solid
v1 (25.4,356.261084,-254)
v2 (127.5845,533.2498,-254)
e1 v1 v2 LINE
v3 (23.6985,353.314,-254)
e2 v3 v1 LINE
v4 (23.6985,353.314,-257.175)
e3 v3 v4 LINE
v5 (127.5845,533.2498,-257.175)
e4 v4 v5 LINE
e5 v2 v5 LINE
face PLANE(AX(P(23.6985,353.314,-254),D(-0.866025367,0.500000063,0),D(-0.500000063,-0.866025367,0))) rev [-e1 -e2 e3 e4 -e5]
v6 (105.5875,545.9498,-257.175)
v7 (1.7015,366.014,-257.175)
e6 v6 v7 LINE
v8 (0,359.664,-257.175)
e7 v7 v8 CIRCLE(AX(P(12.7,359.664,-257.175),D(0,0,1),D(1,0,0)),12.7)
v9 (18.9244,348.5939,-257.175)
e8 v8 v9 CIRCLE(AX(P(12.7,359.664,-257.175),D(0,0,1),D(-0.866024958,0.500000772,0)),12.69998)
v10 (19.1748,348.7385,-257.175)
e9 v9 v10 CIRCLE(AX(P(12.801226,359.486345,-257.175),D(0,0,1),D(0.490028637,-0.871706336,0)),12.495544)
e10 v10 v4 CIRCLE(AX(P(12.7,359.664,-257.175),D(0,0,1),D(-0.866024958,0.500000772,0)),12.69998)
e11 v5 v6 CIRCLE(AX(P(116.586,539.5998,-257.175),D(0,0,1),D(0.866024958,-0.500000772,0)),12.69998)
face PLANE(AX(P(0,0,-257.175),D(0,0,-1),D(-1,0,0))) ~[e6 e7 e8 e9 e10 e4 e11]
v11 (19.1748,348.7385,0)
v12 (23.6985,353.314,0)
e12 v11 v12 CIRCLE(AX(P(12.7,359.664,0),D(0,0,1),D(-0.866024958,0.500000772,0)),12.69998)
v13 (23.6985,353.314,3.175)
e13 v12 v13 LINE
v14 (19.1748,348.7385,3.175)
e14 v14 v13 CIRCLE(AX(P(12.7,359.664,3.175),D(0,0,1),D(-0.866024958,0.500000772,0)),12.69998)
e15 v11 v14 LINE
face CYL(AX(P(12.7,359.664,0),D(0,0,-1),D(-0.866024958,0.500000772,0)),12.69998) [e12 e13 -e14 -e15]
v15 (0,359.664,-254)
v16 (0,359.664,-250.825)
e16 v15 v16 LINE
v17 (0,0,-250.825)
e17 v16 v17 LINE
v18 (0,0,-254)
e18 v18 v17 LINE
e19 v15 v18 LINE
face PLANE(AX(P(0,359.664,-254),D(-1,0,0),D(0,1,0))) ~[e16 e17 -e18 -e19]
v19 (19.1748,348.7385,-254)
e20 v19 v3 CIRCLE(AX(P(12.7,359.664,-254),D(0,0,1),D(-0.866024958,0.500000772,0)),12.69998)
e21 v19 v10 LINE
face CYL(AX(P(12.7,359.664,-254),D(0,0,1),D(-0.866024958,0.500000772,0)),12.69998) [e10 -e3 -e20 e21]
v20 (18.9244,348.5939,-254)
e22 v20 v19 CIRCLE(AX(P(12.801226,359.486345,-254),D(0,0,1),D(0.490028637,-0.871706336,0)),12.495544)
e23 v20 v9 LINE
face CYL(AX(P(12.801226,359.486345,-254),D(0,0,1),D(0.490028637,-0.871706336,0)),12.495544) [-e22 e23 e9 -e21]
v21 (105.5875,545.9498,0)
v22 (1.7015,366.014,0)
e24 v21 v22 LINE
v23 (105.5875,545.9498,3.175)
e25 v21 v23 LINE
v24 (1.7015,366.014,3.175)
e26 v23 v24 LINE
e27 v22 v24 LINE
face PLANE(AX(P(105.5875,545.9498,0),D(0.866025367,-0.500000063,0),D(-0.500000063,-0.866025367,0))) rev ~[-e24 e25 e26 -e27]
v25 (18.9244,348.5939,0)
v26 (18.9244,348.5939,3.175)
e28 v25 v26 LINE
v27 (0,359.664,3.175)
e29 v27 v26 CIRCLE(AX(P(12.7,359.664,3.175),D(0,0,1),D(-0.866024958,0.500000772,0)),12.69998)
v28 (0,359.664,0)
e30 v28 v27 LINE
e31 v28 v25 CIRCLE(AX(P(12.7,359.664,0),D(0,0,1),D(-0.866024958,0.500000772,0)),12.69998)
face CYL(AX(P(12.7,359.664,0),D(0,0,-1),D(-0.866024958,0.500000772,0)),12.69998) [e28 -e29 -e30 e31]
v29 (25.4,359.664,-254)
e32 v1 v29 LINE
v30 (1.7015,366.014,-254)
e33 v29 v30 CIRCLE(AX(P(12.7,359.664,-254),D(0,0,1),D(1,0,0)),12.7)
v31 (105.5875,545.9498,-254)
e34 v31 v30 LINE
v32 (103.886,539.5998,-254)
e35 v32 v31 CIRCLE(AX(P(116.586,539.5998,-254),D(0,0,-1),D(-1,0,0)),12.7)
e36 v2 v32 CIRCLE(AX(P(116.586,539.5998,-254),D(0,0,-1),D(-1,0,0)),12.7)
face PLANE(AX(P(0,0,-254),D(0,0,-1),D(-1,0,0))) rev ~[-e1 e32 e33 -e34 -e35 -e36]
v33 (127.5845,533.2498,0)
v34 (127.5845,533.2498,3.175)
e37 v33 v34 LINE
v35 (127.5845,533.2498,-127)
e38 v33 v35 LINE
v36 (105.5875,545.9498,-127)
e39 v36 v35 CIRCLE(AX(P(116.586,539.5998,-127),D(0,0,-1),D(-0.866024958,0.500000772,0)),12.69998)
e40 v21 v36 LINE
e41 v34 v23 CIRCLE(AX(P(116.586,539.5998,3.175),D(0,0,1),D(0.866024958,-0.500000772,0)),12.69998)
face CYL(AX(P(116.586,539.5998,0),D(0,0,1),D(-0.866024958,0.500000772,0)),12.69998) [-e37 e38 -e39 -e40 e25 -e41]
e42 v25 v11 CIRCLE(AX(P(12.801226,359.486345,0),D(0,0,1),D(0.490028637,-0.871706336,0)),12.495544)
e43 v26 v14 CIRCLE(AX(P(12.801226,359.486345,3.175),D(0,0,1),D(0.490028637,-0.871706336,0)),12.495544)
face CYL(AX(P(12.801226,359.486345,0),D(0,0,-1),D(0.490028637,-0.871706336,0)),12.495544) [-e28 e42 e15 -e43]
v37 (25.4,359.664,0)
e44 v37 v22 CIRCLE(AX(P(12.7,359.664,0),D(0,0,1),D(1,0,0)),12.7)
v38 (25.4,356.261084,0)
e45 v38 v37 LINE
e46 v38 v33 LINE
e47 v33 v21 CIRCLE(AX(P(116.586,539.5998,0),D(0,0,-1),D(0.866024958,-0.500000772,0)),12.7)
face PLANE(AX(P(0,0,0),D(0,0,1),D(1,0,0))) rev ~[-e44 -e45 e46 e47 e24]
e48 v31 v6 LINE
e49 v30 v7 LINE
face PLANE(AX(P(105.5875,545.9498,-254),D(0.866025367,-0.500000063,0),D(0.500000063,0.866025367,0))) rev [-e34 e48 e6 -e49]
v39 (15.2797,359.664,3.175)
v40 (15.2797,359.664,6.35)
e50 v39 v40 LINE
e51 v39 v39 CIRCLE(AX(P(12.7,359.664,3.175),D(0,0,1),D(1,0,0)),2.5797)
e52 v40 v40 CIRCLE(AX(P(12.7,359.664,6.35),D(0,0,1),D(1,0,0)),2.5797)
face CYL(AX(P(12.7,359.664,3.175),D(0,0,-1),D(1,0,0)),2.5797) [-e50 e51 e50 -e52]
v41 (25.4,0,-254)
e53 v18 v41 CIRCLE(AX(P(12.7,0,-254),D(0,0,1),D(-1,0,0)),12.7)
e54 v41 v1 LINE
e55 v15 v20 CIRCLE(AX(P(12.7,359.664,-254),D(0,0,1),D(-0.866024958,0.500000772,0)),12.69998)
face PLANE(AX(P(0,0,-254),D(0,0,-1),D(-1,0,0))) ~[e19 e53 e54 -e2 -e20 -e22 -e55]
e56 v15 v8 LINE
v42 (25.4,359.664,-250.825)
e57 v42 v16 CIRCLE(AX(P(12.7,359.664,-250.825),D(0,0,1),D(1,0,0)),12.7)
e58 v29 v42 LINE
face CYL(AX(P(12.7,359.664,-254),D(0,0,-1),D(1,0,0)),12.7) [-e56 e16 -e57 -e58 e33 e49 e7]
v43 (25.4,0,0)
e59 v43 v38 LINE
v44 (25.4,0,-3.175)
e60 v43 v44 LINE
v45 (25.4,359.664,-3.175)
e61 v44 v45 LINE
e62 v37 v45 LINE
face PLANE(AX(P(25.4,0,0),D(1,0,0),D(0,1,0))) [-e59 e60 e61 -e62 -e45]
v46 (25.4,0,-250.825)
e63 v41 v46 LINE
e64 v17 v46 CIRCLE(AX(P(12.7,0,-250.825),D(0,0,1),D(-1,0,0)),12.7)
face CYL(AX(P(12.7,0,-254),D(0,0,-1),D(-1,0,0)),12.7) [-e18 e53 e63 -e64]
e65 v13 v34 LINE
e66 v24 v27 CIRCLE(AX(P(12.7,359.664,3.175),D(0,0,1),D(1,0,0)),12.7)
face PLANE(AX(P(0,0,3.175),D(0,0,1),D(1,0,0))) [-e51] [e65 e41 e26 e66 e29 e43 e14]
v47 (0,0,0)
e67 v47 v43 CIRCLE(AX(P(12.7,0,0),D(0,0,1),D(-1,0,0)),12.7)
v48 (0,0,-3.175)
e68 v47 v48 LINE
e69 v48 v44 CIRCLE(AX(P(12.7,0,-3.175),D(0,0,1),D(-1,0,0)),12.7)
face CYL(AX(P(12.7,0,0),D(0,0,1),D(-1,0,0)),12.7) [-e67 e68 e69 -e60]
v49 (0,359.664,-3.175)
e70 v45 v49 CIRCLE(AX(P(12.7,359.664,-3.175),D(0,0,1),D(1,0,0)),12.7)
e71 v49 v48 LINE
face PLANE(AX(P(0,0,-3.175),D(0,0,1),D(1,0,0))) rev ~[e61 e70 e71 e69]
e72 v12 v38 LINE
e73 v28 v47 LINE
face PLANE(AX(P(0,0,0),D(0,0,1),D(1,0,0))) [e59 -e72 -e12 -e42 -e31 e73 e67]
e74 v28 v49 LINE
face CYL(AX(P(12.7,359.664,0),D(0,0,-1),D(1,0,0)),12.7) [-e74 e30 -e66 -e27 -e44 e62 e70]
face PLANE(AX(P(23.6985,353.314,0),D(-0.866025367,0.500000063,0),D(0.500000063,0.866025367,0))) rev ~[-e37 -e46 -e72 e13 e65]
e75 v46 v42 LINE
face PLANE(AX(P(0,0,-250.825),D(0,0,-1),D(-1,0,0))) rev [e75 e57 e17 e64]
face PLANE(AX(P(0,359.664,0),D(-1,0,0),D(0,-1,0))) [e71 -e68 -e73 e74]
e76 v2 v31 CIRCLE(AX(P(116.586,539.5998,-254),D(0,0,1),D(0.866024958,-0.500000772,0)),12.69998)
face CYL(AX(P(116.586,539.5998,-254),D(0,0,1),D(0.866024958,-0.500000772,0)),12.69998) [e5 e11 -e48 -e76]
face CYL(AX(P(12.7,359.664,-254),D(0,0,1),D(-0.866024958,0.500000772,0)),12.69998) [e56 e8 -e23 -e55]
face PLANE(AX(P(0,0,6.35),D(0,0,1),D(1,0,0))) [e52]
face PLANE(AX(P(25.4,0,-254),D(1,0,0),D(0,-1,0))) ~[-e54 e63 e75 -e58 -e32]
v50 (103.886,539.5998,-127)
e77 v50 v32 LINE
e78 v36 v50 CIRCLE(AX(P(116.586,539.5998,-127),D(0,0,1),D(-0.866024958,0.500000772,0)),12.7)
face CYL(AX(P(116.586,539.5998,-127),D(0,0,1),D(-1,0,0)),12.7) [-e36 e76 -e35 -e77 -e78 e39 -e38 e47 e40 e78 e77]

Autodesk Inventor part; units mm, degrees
ref_plane "YZ Plane" through (0, 0, 0) normal (1, 0, 0) x (0, 1, 0)
sketch "Sketch1" plane through (0, 0, 0) normal (0, 0, 1) x (1, 0, 0)
  line L0 (25.4, 0) -> (25.4, 359.664)
  line L1 (0, 359.664) -> (0, 0)
  arc A0 (0, 0) -> (25.4, 0) centre (12.7, 0) ccw
  arc A1 (25.4, 359.664) -> (0, 359.664) centre (12.7, 359.664) ccw
sketch "Sketch2" plane through (0, 0, 0) normal (0, 0, 1) x (1, 0, 0)
  line L0 (-287.7794, 186.1816) -> (71.8846, 186.1816) construction
  arc A0 (25.4, 359.664) -> (0, 359.664) centre (12.7, 359.664) ccw projected
  arc A1 (18.9244, 348.5939) -> (19.1748, 348.7385) centre (12.7, 359.664) ccw
  arc A2 (6.4756, 370.7341) -> (6.2252, 370.5895) centre (12.7, 359.664) ccw
  line L1 (12.7, 359.664) -> (220.472, 359.664) construction
  line L2 (23.6985, 353.314) -> (127.5845, 533.2498)
  line L3 (105.5875, 545.9498) -> (1.7015, 366.014)
  arc A3 (1.7015, 366.014) -> (23.6985, 353.314) centre (12.7, 359.664) ccw
  arc A4 (127.5845, 533.2498) -> (105.5875, 545.9498) centre (116.586, 539.5998) ccw
  point P0 (0, 0)
extrude "Extrusion1" add sketch "Sketch2" along normal blind 3.175
extrude "Extrusion2" add sketch "Sketch1" against normal blind 3.175
sketch "Sketch3" plane through (0, 0, 3.175) normal (0, 0, 1) x (1, 0, 0)
  circle A0 centre (12.7, 359.664) radius 2.5797
  point P0 (0, 0)
  dimension "d12" = 5.1594
extrude "Extrusion3" add sketch "Sketch3" along normal blind 3.175
sketch "Sketch4" plane through (0, 0, 0) normal (0, 0, -1) x (-1, 0, 0)
  arc A0 (-105.5875, 545.9498) -> (-127.5845, 533.2498) centre (-116.586, 539.5998) ccw projected
  circle A1 centre (-116.586, 539.5998) radius 12.7
  point P0 (0, 0)
extrude "Extrusion4" add sketch "Sketch4" along normal blind 127
ref_plane "Work Plane2" through (127.5845, 533.2498, -119.0625) normal (0, 0, 1) x (1, 0, 0)
ref_plane "Work Plane1" through (127.5845, 533.2498, 1.5875) normal (0, 0, 1) x (1, 0, 0)
ref_plane "Work Plane3" through (116.586, 539.5998, -127) normal (0, 0, -1) x (-1, 0, 0)
mirror "Mirror2" about plane through (116.586, 539.5998, -127) normal (0, 0, -1) of "Extrusion1", "Extrusion2"
sketch "Sketch5" plane through (116.586, 539.5998, -127) normal (0, 0, -1) x (-1, 0, 0)
  circle A0 centre (0, 0) radius 12.7 projected
  circle A1 centre (0, 0) radius 12.7
  point P0 (116.586, -539.5998)
extrude "Extrusion5" add sketch "Sketch5" along normal blind 127
properties part number "cart handle"
